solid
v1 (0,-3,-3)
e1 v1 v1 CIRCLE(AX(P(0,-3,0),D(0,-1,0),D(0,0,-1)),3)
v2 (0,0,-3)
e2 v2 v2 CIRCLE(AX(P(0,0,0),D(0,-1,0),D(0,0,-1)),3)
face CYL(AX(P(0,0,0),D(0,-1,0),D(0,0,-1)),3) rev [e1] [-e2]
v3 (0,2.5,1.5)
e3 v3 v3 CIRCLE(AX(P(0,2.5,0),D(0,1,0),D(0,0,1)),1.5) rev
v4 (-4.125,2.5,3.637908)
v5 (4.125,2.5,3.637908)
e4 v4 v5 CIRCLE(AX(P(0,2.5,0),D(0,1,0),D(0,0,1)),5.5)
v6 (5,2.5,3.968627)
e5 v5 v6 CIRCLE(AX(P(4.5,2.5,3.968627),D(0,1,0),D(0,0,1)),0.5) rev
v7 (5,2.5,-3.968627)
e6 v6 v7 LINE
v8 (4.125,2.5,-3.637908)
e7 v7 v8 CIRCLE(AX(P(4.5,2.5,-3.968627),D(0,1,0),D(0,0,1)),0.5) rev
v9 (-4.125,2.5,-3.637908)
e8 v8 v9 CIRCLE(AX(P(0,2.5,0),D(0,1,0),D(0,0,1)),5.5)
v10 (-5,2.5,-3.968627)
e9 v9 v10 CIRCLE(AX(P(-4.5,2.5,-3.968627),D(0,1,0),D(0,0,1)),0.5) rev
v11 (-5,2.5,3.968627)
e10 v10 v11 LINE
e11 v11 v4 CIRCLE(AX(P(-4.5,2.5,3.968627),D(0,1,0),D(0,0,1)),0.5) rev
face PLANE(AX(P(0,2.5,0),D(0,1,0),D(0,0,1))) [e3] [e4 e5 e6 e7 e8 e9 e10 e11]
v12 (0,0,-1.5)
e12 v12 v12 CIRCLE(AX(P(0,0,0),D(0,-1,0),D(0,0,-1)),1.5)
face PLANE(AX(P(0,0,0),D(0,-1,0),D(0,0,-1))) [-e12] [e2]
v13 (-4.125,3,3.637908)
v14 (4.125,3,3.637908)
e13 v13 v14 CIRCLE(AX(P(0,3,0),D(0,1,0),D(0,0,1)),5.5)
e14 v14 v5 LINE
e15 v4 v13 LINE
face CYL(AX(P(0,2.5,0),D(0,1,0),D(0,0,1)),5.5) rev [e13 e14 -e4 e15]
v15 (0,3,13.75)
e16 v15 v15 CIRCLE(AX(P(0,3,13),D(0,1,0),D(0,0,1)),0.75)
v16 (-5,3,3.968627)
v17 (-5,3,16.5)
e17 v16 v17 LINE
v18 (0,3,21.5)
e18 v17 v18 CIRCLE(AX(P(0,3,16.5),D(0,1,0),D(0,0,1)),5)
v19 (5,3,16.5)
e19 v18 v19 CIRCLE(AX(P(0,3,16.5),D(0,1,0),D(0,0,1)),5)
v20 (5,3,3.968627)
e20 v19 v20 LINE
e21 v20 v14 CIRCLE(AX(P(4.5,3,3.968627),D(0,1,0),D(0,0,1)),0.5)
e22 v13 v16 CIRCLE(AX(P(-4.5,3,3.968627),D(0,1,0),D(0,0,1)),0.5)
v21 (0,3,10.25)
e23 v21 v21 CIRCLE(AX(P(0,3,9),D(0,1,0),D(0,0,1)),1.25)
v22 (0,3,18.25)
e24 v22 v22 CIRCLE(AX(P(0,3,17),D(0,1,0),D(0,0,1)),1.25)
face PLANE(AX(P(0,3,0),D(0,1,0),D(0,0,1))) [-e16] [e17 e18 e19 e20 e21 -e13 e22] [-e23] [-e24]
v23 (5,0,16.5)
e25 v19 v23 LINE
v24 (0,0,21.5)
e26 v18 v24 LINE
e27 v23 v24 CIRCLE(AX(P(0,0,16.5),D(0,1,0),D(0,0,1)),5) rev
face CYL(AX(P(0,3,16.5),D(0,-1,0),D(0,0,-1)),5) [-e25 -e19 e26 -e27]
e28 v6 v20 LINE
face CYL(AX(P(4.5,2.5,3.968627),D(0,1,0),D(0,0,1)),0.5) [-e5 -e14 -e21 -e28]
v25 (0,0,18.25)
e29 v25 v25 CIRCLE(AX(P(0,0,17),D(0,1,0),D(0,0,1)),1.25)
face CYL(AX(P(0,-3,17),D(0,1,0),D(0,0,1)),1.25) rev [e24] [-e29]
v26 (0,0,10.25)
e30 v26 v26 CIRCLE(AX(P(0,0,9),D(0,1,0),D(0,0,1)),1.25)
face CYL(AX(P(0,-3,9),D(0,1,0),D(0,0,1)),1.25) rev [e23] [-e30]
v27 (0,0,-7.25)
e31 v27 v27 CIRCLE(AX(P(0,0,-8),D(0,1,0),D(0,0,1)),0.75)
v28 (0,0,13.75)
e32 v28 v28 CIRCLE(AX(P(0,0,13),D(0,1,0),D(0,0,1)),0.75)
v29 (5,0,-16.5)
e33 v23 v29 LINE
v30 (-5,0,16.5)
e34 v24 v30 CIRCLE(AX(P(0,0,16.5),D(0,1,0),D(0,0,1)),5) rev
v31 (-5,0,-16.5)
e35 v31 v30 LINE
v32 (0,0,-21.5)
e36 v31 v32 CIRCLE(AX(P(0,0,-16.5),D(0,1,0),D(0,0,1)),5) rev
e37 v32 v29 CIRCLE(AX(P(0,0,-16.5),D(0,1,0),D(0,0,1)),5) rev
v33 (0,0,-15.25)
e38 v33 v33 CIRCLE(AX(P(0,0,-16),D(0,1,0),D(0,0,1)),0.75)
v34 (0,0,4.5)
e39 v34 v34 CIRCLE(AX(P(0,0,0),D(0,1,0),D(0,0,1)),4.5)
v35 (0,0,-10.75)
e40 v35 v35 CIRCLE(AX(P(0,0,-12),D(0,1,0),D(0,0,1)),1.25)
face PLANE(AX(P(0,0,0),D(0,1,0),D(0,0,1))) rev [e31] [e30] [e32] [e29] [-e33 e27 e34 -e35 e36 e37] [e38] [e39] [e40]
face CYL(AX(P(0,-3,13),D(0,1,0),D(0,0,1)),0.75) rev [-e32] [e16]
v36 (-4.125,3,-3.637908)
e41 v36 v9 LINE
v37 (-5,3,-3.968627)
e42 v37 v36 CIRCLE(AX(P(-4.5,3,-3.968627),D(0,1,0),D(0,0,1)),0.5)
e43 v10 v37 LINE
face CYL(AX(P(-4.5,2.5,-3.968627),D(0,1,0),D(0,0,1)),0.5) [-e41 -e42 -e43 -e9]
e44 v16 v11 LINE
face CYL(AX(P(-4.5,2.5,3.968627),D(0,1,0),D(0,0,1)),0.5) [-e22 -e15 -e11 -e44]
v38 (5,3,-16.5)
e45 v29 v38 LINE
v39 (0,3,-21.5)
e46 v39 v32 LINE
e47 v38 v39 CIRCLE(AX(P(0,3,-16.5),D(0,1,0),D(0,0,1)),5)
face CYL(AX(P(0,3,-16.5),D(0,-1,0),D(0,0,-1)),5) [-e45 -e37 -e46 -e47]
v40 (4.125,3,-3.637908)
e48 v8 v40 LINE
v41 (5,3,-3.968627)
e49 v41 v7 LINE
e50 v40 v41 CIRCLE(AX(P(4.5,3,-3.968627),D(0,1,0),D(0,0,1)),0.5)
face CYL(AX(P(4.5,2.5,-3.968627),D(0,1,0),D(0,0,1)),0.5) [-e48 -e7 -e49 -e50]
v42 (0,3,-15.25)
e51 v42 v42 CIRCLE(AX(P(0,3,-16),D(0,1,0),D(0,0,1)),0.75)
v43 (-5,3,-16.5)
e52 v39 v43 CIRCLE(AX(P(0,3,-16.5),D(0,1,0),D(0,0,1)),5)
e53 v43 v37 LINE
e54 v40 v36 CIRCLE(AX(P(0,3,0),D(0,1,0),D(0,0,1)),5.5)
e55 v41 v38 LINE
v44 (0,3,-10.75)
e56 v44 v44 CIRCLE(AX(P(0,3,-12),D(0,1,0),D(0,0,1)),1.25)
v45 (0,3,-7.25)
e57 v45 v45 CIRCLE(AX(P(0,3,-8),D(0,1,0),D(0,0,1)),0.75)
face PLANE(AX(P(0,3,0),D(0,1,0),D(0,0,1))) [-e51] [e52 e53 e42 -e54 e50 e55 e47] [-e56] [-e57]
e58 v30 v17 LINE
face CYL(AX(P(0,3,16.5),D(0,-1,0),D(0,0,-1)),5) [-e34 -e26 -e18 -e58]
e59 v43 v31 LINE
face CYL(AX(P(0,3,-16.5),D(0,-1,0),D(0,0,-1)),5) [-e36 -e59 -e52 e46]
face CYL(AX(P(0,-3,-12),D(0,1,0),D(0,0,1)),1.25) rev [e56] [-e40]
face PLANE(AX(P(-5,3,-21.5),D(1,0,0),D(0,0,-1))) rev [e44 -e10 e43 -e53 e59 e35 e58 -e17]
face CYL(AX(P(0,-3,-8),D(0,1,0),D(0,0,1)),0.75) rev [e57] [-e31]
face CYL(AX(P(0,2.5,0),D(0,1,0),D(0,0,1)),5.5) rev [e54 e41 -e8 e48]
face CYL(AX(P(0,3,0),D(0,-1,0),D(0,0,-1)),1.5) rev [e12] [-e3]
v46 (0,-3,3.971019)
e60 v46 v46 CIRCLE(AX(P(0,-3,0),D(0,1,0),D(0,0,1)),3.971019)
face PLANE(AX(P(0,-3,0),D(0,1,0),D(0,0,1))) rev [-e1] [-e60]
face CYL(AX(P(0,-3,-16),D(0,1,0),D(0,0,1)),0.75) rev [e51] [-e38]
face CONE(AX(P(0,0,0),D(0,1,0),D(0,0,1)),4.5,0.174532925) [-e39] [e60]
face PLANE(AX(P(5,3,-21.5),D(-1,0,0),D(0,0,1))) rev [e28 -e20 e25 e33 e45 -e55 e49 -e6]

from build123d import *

# Parameters (mm, degrees)
SKETCH1_W           = 10
SKETCH1_H           = 43
BOSS_EXTRUDE1_DEPTH = 3
FILLET1_R           = 5
SKETCH2_R           = 4.5
BOSS_EXTRUDE2_DEPTH = 3
DRAFT1_ANGLE        = 10
SKETCH3_R           = 3
CUT_EXTRUDE1_DEPTH  = 3
SKETCH4_R           = 1.5
CUT_EXTRUDE2_DEPTH  = 23.27666941
SKETCH5_R           = 5.5
CUT_EXTRUDE3_DEPTH  = 0.5
FILLET2_R           = 0.5
SKETCH6_R           = 1.25
SKETCH6_R_2         = 0.75
CUT_EXTRUDE4_DEPTH  = 23.874658467


with BuildPart() as part:
    # Sketch1 → Boss-Extrude1 (new body)
    with BuildSketch(Plane(origin=(0, 0, 0), x_dir=(1, 0, 0), z_dir=(0, 1, 0))):
        Rectangle(SKETCH1_W, SKETCH1_H)
    extrude(amount=BOSS_EXTRUDE1_DEPTH)

    # Fillet1
    fillet1_edges = [part.edges().sort_by_distance(p)[0] for p in [
        (-5, 1.5, -21.5),
        (5, 1.5, -21.5),
        (5, 1.5, 21.5),
        (-5, 1.5, 21.5),
    ]]
    fillet(fillet1_edges, radius=FILLET1_R - 0.0001)  # a hair under: the kernel refuses the full size

    # Sketch2 → Boss-Extrude2 (add)
    with BuildSketch(Plane(origin=(0, 0, 0), x_dir=(1, 0, 0), z_dir=(0, 1, 0))):
        with Locations(Location((0, 0, 0), (0, 0, 270))):
            Circle(SKETCH2_R)
    extrude(amount=-BOSS_EXTRUDE2_DEPTH)

    # Draft1
    draft1_faces = [part.faces().sort_by_distance(p)[0] for p in [
        (0, -1.5, -4.5),
    ]]
    draft(draft1_faces, Plane(origin=(0, 0, 0), x_dir=(0, 0, -1), z_dir=(0, -1, 0)), DRAFT1_ANGLE)

    # Sketch3 → Cut-Extrude1 (cut)
    with BuildSketch(Plane.XZ.offset(3)):
        with Locations(Location((0, 0, 0), (0, 0, 270))):
            Circle(SKETCH3_R)
    extrude(amount=-CUT_EXTRUDE1_DEPTH, mode=Mode.SUBTRACT)

    # Sketch4 → Cut-Extrude2 (cut, through all)
    with BuildSketch(Plane.XZ):
        with Locations(Location((0, 0, 0), (0, 0, 270))):
            Circle(SKETCH4_R)
    extrude(amount=-CUT_EXTRUDE2_DEPTH, mode=Mode.SUBTRACT)

    # Sketch5 → Cut-Extrude3 (cut)
    with BuildSketch(Plane(origin=(0, 3, 0), x_dir=(1, 0, 0), z_dir=(0, 1, 0))):
        Circle(SKETCH5_R)
    extrude(amount=-CUT_EXTRUDE3_DEPTH, mode=Mode.SUBTRACT)

    # Fillet2
    fillet2_edges = [part.edges().sort_by_distance(p)[0] for p in [
        (-5, 2.75, -2.291287847),
        (5, 2.75, -2.291287847),
        (-5, 2.75, 2.291287847),
        (5, 2.75, 2.291287847),
    ]]
    fillet(fillet2_edges, radius=FILLET2_R)

    # Sketch6 → Cut-Extrude4 (cut, through all)
    with BuildSketch(Plane(origin=(0, 3, 0), x_dir=(1, 0, 0), z_dir=(0, 1, 0))):
        with Locations(Location((0, 12, 0), (0, 0, 270))):
            Circle(SKETCH6_R)
        with Locations(Location((0, 16, 0), (0, 0, 270))):
            Circle(SKETCH6_R_2)
        with Locations(Location((0, 8, 0), (0, 0, 270))):
            Circle(SKETCH6_R_2)
        with Locations(Location((0, -17, 0), (0, 0, 270))):
            Circle(SKETCH6_R)
        with Locations(Location((0, -9, 0), (0, 0, 270))):
            Circle(SKETCH6_R)
        with Locations(Location((0, -13, 0), (0, 0, 270))):
            Circle(SKETCH6_R_2)
    extrude(amount=-CUT_EXTRUDE4_DEPTH, mode=Mode.SUBTRACT)


solid = part.part
